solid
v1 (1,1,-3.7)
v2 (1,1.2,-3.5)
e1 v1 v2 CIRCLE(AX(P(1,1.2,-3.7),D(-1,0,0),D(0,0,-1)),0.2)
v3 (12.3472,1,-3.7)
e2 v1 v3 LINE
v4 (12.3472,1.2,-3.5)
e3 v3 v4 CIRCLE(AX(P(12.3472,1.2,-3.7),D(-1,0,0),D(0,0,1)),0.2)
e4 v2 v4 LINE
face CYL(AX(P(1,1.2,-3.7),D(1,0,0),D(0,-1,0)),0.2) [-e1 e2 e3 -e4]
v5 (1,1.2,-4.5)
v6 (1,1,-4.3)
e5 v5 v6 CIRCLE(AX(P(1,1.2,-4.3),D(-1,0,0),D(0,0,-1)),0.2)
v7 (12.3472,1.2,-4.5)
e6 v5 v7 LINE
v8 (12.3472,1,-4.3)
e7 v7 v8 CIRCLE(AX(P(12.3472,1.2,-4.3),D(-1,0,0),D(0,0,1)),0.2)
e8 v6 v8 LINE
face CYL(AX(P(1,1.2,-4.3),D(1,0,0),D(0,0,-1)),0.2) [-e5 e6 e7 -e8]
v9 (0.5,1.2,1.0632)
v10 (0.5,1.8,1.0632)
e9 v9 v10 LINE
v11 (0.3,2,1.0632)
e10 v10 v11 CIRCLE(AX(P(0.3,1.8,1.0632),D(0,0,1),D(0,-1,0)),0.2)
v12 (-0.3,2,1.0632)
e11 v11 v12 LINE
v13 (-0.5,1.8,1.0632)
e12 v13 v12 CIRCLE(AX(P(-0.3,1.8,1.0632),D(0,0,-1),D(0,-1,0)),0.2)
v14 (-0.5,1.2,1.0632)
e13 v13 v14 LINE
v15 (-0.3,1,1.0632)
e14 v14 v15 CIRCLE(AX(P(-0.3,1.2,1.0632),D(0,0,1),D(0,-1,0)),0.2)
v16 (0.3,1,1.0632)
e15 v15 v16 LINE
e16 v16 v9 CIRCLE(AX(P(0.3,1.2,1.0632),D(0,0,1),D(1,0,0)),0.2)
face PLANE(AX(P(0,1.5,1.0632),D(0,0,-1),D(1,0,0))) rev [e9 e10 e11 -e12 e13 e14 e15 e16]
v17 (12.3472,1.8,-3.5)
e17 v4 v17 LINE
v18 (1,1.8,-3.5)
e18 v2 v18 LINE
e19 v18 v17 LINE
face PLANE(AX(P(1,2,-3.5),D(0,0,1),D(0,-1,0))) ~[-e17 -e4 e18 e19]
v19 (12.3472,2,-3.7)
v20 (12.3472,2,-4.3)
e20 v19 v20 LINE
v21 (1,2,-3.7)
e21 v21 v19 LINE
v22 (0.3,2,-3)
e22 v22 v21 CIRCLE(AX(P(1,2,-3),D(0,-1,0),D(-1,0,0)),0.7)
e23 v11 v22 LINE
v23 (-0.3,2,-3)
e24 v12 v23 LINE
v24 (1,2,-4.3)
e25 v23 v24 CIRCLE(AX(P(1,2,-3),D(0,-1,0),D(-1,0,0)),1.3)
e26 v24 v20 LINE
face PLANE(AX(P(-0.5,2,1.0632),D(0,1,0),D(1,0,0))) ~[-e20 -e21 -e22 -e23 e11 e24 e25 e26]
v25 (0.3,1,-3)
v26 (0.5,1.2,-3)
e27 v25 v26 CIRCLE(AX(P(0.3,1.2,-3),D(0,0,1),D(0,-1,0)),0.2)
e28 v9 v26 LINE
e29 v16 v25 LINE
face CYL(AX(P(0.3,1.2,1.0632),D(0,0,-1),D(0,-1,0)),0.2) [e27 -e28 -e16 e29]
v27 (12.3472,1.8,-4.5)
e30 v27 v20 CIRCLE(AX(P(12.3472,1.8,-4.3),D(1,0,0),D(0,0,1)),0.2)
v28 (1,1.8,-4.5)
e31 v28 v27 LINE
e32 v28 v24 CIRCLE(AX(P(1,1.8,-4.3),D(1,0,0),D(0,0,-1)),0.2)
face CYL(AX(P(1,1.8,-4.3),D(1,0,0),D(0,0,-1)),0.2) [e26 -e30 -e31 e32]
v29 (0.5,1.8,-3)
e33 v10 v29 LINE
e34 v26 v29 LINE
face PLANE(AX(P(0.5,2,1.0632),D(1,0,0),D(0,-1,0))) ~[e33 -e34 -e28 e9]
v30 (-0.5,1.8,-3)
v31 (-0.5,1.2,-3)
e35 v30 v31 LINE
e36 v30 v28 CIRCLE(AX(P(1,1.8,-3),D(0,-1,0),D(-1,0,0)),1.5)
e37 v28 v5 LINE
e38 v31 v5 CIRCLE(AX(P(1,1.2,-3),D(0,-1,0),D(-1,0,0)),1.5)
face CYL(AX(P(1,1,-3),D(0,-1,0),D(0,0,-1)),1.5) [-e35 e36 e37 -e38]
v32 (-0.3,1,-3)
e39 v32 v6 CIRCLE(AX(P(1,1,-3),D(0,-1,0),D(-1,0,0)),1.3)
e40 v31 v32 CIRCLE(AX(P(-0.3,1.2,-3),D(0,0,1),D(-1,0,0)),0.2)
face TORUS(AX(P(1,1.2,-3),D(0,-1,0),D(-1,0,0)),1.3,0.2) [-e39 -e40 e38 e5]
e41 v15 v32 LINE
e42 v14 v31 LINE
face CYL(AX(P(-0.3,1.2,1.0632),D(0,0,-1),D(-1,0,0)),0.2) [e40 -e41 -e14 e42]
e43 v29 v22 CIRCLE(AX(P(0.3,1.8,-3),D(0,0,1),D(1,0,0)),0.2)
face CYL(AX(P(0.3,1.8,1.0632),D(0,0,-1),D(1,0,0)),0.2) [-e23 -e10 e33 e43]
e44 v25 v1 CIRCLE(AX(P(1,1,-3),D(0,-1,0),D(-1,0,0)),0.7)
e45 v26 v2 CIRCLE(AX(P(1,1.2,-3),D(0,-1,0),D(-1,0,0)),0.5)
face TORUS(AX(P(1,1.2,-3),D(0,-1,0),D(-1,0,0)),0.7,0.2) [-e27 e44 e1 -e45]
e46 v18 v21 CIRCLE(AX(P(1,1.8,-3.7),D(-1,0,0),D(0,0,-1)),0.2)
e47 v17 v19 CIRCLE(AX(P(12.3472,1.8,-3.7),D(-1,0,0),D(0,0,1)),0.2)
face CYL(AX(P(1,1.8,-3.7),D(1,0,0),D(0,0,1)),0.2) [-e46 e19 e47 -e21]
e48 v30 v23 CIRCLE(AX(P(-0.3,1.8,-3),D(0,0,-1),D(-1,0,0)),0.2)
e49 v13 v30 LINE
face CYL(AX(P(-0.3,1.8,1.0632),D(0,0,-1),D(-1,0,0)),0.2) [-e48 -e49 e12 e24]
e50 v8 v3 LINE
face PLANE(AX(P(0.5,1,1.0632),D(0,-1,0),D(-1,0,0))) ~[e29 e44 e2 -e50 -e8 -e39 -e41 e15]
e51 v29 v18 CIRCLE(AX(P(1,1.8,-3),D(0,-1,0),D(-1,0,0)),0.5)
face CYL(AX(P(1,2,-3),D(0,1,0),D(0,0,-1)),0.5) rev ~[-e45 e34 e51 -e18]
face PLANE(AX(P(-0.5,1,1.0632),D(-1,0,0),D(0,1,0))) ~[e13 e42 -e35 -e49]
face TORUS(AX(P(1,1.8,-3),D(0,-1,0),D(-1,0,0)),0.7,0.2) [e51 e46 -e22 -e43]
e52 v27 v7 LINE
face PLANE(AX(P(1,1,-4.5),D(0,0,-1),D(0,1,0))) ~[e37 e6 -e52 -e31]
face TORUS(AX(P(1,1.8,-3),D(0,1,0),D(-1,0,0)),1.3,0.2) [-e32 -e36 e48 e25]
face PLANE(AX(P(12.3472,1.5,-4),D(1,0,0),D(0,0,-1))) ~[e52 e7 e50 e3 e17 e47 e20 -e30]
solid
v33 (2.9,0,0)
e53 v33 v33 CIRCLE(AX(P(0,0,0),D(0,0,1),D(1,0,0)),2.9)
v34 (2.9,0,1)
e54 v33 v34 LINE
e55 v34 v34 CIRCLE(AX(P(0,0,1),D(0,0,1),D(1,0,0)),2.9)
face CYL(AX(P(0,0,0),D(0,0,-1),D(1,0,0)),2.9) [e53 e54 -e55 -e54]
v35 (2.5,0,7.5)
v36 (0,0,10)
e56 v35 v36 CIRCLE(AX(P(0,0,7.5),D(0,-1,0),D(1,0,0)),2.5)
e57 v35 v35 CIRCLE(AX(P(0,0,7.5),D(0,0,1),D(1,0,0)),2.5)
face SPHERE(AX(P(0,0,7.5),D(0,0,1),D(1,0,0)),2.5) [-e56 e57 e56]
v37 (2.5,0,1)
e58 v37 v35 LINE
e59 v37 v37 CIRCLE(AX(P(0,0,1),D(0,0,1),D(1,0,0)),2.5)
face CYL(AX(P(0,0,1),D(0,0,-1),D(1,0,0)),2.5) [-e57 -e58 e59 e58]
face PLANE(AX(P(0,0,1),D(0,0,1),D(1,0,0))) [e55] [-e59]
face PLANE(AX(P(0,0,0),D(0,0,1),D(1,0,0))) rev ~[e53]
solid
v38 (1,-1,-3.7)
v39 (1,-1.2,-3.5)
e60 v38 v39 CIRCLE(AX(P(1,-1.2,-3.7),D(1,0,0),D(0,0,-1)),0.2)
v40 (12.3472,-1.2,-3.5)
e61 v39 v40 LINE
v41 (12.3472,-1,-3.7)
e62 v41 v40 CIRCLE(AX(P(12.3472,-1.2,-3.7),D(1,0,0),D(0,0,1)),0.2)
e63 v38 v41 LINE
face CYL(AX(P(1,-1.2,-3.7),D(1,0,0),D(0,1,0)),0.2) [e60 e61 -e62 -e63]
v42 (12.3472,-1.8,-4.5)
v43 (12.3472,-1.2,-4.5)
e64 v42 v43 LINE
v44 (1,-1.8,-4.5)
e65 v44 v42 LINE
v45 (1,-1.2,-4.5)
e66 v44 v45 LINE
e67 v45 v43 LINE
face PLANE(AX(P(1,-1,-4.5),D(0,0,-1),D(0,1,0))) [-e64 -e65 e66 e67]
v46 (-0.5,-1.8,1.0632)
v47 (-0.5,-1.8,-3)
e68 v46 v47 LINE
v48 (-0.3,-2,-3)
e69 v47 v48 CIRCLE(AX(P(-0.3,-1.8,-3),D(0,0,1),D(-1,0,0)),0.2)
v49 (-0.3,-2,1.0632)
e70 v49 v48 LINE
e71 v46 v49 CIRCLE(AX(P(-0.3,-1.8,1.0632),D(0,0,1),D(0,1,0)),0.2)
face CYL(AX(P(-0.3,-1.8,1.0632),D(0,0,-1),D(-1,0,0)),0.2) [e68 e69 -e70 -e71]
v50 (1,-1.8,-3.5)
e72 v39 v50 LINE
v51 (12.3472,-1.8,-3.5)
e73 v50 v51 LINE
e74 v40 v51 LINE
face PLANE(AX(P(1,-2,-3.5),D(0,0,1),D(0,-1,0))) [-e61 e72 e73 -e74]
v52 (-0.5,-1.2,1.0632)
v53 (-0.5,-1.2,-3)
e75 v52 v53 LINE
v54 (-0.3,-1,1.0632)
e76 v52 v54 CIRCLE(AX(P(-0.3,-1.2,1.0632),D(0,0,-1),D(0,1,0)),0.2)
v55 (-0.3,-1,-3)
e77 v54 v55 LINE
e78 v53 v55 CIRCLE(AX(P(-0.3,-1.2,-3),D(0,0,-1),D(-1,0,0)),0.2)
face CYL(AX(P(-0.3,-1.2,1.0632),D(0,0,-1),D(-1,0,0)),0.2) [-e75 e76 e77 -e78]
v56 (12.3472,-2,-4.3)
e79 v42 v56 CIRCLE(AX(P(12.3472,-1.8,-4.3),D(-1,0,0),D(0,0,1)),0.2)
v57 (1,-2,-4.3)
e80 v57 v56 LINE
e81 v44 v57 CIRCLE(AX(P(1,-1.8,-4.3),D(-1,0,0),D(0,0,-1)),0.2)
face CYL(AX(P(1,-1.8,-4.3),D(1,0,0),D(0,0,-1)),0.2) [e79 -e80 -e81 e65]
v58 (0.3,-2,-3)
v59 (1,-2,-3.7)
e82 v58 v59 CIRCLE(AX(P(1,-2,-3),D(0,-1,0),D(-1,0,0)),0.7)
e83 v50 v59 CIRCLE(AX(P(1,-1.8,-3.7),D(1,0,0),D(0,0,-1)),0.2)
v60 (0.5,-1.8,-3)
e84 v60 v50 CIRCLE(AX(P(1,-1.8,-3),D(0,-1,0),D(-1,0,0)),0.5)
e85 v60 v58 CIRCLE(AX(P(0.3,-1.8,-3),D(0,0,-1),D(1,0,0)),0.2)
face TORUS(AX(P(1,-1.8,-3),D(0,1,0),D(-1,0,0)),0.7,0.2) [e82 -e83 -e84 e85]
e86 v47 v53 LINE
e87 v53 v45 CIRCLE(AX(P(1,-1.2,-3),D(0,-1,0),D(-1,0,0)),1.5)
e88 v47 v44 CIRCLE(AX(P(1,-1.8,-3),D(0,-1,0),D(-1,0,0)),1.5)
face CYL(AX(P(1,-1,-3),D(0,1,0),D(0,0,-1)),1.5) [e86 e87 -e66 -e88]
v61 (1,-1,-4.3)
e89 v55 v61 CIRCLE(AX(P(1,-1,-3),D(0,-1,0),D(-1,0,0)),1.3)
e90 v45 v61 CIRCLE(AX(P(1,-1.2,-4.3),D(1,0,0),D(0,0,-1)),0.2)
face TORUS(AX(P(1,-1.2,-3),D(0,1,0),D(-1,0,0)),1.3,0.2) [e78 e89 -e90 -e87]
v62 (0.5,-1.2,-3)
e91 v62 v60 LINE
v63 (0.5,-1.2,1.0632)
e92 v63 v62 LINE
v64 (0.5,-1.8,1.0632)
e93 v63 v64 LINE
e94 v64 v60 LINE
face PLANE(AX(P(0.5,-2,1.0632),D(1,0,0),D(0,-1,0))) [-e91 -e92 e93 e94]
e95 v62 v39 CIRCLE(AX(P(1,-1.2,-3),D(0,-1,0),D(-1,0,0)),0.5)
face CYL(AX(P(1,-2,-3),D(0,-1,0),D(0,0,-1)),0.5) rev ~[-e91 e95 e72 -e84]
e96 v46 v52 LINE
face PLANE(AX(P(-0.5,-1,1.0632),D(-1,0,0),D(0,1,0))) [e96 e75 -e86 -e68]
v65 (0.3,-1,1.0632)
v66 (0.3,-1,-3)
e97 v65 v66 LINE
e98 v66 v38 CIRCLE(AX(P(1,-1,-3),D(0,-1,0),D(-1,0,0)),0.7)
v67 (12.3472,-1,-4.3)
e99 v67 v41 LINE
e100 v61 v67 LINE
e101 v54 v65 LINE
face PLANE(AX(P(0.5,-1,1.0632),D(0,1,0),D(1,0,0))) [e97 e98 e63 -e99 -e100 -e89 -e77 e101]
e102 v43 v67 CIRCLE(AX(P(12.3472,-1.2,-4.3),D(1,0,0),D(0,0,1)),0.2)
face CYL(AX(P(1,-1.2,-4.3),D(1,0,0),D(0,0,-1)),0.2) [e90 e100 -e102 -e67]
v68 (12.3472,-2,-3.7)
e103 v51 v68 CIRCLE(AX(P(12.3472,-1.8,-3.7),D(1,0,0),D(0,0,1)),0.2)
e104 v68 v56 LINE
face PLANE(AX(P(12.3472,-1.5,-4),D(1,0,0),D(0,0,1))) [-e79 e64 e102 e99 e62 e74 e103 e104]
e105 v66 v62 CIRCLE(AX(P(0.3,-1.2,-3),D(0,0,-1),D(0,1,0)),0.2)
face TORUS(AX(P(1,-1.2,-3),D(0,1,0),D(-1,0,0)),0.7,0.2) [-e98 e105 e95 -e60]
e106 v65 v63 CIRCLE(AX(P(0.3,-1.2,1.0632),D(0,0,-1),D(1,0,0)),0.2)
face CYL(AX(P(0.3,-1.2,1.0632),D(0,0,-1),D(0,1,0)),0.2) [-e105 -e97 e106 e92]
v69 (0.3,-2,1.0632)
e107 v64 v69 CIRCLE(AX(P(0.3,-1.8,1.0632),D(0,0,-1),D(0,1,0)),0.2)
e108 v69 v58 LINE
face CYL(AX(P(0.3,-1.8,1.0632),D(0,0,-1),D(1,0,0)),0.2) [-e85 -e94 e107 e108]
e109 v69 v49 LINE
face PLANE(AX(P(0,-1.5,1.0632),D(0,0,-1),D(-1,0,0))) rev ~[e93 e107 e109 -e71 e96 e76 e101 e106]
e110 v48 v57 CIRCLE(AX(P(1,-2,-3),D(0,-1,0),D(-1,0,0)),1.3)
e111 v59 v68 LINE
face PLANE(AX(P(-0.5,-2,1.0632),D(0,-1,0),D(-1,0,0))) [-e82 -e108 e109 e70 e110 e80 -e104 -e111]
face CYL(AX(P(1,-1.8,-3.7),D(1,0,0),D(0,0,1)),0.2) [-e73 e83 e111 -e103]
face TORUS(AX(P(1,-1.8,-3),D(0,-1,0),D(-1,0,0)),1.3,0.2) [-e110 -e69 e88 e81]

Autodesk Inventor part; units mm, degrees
ref_plane "YZ Plane" through (0, 0, 0) normal (1, 0, 0) x (0, 1, 0)
sketch "Skizze1" plane through (0, 0, 0) normal (0, 0, 1) x (1, 0, 0)
  circle A0 centre (0, 0) radius 2.9
  dimension "d0" = 5.8
extrude "Extrusion1" add sketch "Skizze1" along normal blind 1
sketch "Skizze2" plane through (0, 0, 1) normal (0, 0, 1) x (1, 0, 0)
  circle A0 centre (0, 0) radius 2.5
  dimension "d3" = 5
extrude "Extrusion2" add sketch "Skizze2" along normal blind 9
fillet "Rundung1" radius 2.5 1 edges at (-2.5, 0, 10)
sketch "Skizze3" plane through (0, 0, 0) normal (0, 0, -1) x (-1, 0, 0)
  point P0 (0, 0)
ref_plane "Arbeitsebene1" through (0, -1.5, 0) normal (0, 1, 0) x (-1, 0, 0)
sketch "Skizze4" plane through (0, -1.5, 0) normal (0, 1, 0) x (-1, 0, 0)
  line L0 (0, 1.0632) -> (0, -3)
  line L1 (-1, -4) -> (-12.3472, -4)
  arc A0 (-1, -4) -> (0, -3) centre (-1, -3) ccw
  line L2 (2.9, 0) -> (-2.9, 0) projected
  point P0 (0, 0)
  dimension "d8" = 1
  dimension "d9" = 4
ref_plane "Arbeitsebene2" through (12.3472, -1.5, -4) normal (1, 0, 0) x (0, 1, 0)
sketch "Skizze5" plane through (12.3472, -1.5, -4) normal (1, 0, 0) x (0, 1, 0)
  line L0 (0.5, -0.5) -> (-0.5, -0.5)
  line L1 (-0.5, -0.5) -> (-0.5, 0.5)
  line L2 (-0.5, 0.5) -> (0.5, 0.5)
  line L3 (0.5, 0.5) -> (0.5, -0.5)
  line L4 (0.5, -0.5) -> (-0.5, 0.5) construction
  line L5 (-0.5, -0.5) -> (0.5, 0.5) construction
  point P0 (1.5, 4)
  point P1 (0, 0)
  dimension "d10" = 1
sweep "Sweeping1" add profiles "Skizze5" path "Skizze4" separate body path curves L1 A0 L0
fillet "Rundung2" radius 0.2 12 edges at (-0.5, -2, -0.9684) (-0.0607, -2, -4.0607) (6.6736, -2, -4.5) (0.5, -2, -0.9684) (0.6464, -2, -3.3536) (6.6736, -2, -3.5) (-0.5, -1, -0.9684) (-0.0607, -1, -4.0607) (6.6736, -1, -4.5) (0.5, -1, -0.9684) (0.6464, -1, -3.3536) (6.6736, -1, -3.5)
mirror "Spiegeln1" about plane through (0, 0, 0) normal (0, 1, 0) bodies 2
properties part number "P_LED_5"
